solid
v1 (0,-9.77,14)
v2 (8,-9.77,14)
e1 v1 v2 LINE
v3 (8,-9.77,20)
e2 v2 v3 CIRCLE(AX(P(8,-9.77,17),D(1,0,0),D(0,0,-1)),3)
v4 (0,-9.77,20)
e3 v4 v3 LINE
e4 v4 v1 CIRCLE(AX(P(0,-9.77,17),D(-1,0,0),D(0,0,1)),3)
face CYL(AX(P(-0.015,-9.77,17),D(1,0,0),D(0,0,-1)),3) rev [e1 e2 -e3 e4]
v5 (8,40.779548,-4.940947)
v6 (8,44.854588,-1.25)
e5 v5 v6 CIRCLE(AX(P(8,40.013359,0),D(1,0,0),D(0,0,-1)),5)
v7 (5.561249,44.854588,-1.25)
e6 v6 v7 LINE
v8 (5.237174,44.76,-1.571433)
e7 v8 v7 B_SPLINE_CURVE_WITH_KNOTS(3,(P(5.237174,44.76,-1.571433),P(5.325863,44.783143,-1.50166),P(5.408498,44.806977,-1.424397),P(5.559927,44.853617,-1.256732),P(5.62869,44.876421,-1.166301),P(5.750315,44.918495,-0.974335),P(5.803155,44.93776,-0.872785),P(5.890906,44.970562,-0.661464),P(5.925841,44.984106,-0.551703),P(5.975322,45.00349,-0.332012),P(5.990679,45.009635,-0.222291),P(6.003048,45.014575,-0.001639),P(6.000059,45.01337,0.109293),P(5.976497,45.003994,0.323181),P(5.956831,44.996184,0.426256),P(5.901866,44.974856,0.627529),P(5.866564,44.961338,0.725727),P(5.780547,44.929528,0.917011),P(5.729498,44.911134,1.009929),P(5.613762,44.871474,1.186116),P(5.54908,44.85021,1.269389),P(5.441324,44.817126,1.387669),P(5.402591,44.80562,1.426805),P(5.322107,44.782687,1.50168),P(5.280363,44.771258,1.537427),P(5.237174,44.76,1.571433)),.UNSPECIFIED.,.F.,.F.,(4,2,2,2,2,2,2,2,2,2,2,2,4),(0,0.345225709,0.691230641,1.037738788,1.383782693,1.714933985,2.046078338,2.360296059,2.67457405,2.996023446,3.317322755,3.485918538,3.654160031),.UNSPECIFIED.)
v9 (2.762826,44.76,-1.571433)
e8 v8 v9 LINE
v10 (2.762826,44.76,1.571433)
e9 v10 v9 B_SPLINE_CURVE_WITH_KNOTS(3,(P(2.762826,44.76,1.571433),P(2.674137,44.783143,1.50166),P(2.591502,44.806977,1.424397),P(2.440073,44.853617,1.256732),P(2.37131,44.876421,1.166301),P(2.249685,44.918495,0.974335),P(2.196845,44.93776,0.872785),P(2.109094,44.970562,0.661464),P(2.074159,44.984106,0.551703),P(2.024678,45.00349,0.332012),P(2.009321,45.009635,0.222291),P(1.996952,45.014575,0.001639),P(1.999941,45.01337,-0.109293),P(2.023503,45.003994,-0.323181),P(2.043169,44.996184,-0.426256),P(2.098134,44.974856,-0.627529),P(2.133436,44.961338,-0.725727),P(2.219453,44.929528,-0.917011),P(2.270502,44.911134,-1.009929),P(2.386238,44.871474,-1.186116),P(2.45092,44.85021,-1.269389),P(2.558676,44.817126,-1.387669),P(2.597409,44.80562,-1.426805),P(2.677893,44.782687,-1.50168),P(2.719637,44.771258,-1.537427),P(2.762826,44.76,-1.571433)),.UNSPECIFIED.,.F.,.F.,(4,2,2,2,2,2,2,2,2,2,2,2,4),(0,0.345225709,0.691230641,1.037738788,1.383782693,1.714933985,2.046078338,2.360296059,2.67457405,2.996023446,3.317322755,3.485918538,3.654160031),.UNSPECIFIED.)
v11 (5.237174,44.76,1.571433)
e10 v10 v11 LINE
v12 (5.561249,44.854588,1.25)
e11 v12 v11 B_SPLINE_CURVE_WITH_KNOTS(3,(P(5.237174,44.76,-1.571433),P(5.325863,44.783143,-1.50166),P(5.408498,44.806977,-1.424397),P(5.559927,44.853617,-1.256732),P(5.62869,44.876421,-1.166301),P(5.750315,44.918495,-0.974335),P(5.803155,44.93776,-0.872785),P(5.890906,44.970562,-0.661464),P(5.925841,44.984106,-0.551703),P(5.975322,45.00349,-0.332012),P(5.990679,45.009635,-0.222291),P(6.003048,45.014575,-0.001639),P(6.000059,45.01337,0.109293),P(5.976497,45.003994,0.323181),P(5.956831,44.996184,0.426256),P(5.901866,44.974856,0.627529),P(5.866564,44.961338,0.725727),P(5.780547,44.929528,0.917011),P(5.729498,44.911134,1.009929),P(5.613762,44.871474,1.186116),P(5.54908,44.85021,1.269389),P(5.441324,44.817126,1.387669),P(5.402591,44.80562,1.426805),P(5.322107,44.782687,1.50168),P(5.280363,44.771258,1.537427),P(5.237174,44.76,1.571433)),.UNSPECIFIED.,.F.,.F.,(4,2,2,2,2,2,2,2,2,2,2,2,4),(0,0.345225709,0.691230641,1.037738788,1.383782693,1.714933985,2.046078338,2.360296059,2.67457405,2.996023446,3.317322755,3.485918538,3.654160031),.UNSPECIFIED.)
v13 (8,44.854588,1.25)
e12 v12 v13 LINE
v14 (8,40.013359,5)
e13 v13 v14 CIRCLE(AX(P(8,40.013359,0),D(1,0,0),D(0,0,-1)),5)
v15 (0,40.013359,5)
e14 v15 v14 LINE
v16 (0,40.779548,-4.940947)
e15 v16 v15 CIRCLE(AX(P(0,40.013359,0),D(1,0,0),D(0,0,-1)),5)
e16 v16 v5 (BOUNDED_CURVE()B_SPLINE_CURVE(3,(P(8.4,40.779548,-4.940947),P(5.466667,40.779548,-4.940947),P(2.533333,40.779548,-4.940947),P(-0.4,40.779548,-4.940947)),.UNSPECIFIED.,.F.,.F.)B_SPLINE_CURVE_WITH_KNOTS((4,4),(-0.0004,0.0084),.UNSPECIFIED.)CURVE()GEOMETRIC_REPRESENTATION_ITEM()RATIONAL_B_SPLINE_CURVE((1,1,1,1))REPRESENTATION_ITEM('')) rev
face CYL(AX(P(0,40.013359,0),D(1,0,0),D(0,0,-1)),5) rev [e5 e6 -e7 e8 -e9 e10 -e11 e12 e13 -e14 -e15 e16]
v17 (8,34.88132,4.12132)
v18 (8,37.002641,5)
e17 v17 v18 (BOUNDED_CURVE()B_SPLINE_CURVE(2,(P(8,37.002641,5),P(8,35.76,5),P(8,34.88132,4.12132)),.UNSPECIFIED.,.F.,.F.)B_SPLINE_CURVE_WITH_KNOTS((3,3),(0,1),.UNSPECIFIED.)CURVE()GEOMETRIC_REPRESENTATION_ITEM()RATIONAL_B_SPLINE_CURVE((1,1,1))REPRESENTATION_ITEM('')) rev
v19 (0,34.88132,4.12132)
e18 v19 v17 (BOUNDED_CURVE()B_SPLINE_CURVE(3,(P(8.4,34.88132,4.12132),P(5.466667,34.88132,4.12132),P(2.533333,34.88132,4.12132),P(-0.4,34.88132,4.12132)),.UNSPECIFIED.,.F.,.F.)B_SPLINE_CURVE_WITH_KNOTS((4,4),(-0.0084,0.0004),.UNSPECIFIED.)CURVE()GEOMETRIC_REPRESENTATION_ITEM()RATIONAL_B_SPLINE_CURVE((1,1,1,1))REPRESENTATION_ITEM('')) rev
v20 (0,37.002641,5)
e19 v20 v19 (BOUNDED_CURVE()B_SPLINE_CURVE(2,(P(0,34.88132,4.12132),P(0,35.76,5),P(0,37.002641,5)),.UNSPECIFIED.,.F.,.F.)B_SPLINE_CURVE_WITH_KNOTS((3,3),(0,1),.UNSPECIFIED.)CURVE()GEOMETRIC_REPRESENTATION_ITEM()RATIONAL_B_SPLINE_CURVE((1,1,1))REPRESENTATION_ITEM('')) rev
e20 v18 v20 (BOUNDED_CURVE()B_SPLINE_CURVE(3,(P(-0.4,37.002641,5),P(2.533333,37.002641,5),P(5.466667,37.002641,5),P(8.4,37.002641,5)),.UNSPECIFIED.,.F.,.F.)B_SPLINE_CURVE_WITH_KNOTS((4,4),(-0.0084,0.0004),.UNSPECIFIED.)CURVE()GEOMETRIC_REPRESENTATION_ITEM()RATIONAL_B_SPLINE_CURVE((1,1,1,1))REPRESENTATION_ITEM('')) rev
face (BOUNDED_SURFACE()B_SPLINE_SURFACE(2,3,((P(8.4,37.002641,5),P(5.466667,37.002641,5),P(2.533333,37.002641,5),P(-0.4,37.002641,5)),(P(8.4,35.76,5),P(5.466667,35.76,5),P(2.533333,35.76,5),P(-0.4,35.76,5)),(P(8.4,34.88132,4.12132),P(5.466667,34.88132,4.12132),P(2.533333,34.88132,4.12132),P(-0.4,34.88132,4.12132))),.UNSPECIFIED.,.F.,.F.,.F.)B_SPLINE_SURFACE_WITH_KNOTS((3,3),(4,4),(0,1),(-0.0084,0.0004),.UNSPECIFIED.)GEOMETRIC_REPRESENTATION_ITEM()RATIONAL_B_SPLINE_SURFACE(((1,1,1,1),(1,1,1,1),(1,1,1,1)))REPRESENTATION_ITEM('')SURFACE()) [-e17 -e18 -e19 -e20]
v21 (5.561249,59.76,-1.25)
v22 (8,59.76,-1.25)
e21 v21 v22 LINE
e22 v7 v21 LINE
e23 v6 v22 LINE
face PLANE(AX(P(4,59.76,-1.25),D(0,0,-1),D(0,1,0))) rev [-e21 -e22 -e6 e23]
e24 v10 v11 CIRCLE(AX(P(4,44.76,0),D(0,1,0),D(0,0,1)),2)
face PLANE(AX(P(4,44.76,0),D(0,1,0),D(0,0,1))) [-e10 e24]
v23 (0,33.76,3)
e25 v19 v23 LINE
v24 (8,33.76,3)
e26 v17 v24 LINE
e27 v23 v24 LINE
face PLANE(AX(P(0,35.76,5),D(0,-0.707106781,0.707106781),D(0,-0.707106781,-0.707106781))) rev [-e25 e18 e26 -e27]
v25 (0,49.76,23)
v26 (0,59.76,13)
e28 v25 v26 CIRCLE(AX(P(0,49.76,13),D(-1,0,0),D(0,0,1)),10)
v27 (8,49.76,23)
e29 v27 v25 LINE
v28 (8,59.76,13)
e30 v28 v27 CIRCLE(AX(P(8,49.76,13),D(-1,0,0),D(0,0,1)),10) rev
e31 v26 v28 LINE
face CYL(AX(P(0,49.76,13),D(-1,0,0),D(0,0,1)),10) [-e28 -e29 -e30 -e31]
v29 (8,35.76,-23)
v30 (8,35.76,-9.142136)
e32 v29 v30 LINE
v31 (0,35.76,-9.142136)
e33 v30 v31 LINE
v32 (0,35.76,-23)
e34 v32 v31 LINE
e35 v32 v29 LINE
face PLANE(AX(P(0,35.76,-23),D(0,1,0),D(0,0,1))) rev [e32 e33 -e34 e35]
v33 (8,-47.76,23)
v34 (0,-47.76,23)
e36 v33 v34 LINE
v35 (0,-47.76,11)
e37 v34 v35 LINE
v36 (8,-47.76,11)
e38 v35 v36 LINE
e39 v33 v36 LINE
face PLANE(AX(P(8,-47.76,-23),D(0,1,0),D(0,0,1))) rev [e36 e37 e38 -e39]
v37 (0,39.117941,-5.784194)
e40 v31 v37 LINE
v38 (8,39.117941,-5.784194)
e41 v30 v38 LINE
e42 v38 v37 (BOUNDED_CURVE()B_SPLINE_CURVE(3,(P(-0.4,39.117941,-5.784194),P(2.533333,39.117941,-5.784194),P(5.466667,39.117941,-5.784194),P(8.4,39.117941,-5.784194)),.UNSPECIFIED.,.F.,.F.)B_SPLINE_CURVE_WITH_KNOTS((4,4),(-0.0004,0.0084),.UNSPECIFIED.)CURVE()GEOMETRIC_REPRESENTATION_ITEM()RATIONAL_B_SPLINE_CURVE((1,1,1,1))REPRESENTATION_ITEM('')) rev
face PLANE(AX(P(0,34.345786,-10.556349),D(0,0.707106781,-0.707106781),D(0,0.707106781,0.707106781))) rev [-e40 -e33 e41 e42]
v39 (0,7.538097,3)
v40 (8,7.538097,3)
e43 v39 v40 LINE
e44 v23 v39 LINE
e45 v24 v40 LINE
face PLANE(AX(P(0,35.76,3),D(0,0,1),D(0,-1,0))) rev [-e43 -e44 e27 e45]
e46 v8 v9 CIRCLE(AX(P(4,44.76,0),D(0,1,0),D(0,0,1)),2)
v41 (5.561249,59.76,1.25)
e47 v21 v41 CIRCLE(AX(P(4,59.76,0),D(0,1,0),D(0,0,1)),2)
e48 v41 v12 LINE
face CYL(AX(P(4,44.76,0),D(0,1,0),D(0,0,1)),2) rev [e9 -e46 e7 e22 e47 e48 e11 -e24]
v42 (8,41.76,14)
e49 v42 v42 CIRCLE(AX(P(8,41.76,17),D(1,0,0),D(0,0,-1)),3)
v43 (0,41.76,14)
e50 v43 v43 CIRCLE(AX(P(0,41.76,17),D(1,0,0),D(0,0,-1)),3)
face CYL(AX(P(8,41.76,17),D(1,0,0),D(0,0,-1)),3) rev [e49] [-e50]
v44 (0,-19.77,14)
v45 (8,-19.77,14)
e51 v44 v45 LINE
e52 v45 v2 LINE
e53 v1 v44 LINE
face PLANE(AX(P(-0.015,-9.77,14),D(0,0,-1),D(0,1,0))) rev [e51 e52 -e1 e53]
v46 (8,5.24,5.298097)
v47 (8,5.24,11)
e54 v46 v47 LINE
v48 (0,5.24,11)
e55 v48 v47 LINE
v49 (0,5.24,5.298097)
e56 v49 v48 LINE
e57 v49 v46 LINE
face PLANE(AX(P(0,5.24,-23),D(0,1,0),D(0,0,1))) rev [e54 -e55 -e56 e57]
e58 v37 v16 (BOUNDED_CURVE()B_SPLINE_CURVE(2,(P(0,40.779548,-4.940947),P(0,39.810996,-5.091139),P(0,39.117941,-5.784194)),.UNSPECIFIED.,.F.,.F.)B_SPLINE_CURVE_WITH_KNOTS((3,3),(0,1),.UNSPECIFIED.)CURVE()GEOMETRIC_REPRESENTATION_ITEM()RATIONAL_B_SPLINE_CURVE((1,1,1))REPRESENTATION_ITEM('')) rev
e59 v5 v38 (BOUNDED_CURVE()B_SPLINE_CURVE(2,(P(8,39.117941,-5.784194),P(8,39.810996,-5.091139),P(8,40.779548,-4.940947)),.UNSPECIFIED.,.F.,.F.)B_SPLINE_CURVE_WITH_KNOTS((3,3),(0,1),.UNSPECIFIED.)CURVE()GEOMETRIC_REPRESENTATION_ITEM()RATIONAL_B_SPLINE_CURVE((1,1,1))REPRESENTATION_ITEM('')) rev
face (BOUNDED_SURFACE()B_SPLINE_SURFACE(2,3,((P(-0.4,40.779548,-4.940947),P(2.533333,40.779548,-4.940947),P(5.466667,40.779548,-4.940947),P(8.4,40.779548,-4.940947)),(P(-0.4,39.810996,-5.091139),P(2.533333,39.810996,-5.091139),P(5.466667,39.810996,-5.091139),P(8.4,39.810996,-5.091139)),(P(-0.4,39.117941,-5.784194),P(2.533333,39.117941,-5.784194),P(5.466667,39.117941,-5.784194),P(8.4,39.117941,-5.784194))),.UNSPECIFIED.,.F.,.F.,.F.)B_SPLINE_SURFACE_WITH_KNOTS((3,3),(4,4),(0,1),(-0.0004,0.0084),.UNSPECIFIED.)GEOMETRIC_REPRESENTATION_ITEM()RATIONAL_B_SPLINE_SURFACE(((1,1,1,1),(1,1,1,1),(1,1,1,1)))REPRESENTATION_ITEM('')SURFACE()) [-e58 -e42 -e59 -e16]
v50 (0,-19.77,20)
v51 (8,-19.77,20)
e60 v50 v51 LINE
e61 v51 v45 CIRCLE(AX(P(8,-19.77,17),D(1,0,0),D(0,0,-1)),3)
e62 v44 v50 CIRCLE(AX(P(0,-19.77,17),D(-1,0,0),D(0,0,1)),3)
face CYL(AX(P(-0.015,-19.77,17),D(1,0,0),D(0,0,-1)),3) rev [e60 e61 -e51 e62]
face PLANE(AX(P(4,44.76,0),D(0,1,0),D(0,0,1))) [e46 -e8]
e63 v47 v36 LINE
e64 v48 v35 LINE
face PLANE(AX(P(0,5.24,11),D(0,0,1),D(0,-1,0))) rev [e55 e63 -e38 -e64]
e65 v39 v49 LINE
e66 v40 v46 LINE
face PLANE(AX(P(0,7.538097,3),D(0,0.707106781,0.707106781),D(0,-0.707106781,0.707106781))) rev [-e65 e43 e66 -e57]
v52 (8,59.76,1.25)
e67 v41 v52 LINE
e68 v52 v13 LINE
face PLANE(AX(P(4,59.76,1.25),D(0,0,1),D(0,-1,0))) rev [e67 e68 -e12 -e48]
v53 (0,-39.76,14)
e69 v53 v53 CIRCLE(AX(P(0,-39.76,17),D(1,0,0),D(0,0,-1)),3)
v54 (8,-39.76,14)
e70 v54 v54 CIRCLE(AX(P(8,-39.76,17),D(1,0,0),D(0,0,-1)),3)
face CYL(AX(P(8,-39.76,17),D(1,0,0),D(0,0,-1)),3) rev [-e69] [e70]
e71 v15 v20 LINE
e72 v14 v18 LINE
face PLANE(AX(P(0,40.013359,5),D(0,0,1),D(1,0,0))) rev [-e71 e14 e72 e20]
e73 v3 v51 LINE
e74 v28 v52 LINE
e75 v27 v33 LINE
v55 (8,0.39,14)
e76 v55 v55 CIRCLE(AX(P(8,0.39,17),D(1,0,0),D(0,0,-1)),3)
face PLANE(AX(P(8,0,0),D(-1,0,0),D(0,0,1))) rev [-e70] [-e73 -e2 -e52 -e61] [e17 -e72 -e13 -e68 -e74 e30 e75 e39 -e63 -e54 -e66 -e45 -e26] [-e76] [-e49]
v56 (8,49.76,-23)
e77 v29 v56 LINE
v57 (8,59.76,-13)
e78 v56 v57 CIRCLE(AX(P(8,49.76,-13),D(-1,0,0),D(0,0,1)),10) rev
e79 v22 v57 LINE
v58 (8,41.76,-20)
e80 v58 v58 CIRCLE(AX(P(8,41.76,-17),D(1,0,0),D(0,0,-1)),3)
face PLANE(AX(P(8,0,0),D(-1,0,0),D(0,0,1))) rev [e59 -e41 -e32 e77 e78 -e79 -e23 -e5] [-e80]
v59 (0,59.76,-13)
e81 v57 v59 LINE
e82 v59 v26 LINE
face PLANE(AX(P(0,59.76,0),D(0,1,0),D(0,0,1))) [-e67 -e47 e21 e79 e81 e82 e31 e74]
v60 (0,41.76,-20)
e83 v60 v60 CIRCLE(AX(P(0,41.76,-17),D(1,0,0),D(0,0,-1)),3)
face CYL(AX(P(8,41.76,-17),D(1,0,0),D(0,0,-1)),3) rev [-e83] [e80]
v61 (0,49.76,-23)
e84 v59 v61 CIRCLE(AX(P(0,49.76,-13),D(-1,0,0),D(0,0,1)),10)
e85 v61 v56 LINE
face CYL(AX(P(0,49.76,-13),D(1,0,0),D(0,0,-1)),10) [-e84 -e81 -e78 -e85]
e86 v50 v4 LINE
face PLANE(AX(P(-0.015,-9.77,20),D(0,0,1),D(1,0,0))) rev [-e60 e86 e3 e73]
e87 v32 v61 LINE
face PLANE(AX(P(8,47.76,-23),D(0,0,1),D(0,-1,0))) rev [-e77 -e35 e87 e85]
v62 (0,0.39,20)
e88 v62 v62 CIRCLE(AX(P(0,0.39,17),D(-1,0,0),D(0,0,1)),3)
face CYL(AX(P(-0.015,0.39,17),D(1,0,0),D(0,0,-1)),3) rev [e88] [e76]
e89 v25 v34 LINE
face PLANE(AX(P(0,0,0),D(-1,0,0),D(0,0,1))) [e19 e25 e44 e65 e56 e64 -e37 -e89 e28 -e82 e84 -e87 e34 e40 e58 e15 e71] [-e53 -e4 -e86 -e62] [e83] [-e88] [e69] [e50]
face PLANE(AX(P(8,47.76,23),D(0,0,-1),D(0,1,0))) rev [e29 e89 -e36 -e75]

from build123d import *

# Parameters (mm, degrees)
SKETCH1_W                       = 46
SKETCH1_H                       = 95.52
BOSS_EXTRUDE1_DEPTH             = 8
F_6_0MM_CLEARANCE_DOWEL_HOLE1_D = 6
SKETCH4_W                       = 8
SKETCH4_H                       = 46
BOSS_EXTRUDE2_DEPTH             = 12
FILLET1_R                       = 10
SKETCH6_R                       = 2
CUT_EXTRUDE2_DEPTH              = 15
SKETCH9_W                       = 26
SKETCH9_H                       = 30.52
CUT_EXTRUDE5_DEPTH              = 65.531059189
F_6_0MM_CLEARANCE_DOWEL_HOLE2_D = 6
CUT_EXTRUDE13_DEPTH             = 65.531059189
SKETCH7_W                       = 2.5
SKETCH7_H                       = 15
CUT_EXTRUDE12_DEPTH             = 4
SKETCH16_W                      = 34
SKETCH16_H                      = 53
CUT_EXTRUDE9_DEPTH              = 65.531059294
CUT_EXTRUDE14_DEPTH             = 65.531059294
CUT_EXTRUDE15_DEPTH             = 65.531059294
FILLET2_START                   = -1
FILLET2_DEPTH                   = 10
SKETCH22_R                      = 3
CUT_EXTRUDE16_DEPTH             = 65.531059329


with BuildPart() as part:
    # Sketch1 → Boss-Extrude1 (new body)
    with BuildSketch(Plane(origin=(0, 0, 0), x_dir=(0, 0, -1), z_dir=(1, 0, 0))):
        Rectangle(SKETCH1_W, SKETCH1_H)
    extrude(amount=BOSS_EXTRUDE1_DEPTH)

    # Ø6.0mm Clearance Dowel Hole1 (through all)
    with Locations(Plane(origin=(8, 0, 0), x_dir=(0, 0, -1), z_dir=(1, 0, 0))):
        with Locations((-17, 41.76), (17, 41.76)):
            Hole(F_6_0MM_CLEARANCE_DOWEL_HOLE1_D / 2)

    # Sketch4 → Boss-Extrude2 (add)
    with BuildSketch(Plane(origin=(0, 47.76, 0), x_dir=(1, 0, 0), z_dir=(0, 1, 0))):
        with Locations((4, 0)):
            Rectangle(SKETCH4_W, SKETCH4_H)
    extrude(amount=BOSS_EXTRUDE2_DEPTH)

    # Fillet1
    fillet1_edges = [part.edges().sort_by_distance(p)[0] for p in [
        (4, 59.76, 23),
        (4, 59.76, -23),
    ]]
    fillet(fillet1_edges, radius=FILLET1_R)

    # Sketch6 → Cut-Extrude2 (cut)
    with BuildSketch(Plane(origin=(0, 59.76, 0), x_dir=(1, 0, 0), z_dir=(0, 1, 0))):
        with Locations(Location((4, 0, 0), (0, 0, 270))):
            Circle(SKETCH6_R)
    extrude(amount=-CUT_EXTRUDE2_DEPTH, mode=Mode.SUBTRACT)

    # Sketch9 → Cut-Extrude5 (cut, through all)
    with BuildSketch(Plane(origin=(8, 0, 0), x_dir=(0, 0, -1), z_dir=(1, 0, 0))):
        with Locations((10, 20.5)):
            Rectangle(SKETCH9_W, SKETCH9_H)
    extrude(amount=-CUT_EXTRUDE5_DEPTH, mode=Mode.SUBTRACT)

    # Ø6.0mm Clearance Dowel Hole2 (through all)
    with Locations(Plane(origin=(8, 0, 0), x_dir=(0, 0, -1), z_dir=(1, 0, 0))):
        with Locations((-17, -39.76)):
            Hole(F_6_0MM_CLEARANCE_DOWEL_HOLE2_D / 2)

    # Sketch14 → Cut-Extrude13 (cut, through all)
    with BuildSketch(Plane(origin=(8, 0, 0), x_dir=(0, 0, -1), z_dir=(1, 0, 0))):
        with BuildLine():
            Line((5, 40.013359235), (5, 35.76))
            Line((5, 35.76), (-5, 35.76))
            Line((-5, 35.76), (-5, 40.013359235))
            ThreePointArc((-5, 40.013359235), (0, 45.013359235), (5, 40.013359235))
        make_face()
    extrude(amount=-CUT_EXTRUDE13_DEPTH, mode=Mode.SUBTRACT)

    # Sketch7 → Cut-Extrude12 (cut)
    with BuildSketch(Plane(origin=(8, 0, 0), x_dir=(0, 0, -1), z_dir=(1, 0, 0))):
        with Locations((0, 52.26)):
            Rectangle(SKETCH7_W, SKETCH7_H)
    extrude(amount=-CUT_EXTRUDE12_DEPTH, mode=Mode.SUBTRACT)

    # Sketch16 → Cut-Extrude9 (cut, through all)
    with BuildSketch(Plane(origin=(8, 0, 0), x_dir=(0, 0, -1), z_dir=(1, 0, 0))):
        with Locations((6, -21.26)):
            Rectangle(SKETCH16_W, SKETCH16_H)
    extrude(amount=-CUT_EXTRUDE9_DEPTH, mode=Mode.SUBTRACT)

    # Sketch19 → Cut-Extrude14 (cut, through all)
    with BuildSketch(Plane(origin=(8, 0, 0), x_dir=(0, 0, -1), z_dir=(1, 0, 0))):
        Polygon((-5, 35.76), (3.485281374, 27.274718626), (10.556349186, 34.345786438), (2.071067812, 42.831067812), align=None)
    extrude(amount=-CUT_EXTRUDE14_DEPTH, mode=Mode.SUBTRACT)

    # Sketch21 → Cut-Extrude15 (cut, through all)
    with BuildSketch(Plane(origin=(8, 0, 0), x_dir=(0, 0, -1), z_dir=(1, 0, 0))):
        Polygon((-3, 7.538097039), (-5.298097039, 5.24), (-3, 5.24), align=None)
    extrude(amount=-CUT_EXTRUDE15_DEPTH, mode=Mode.SUBTRACT)

    # Fillet2: read off the stored shape, not the designer's step
    # Fillet2 outline → Fillet2 (cut)
    with BuildSketch(Plane.YZ.offset(FILLET2_START)):
        with BuildLine():
            add(Edge.make_bspline(
                [(40.779548187, -4.94094672), (39.810996275, -5.091139348), (39.117941215, -5.784194408)],
                knots=[0, 0, 0, 1, 1, 1], degree=2))
            ThreePointArc((40.779548187, -4.94094672), (40.397589895, -4.98521482), (40.013359235, -5))
            Line((40.013359235, -5), (39.902135624, -5))
            Line((39.902135624, -5), (39.117941215, -5.784194408))
        make_face()
    extrude(amount=FILLET2_DEPTH, mode=Mode.SUBTRACT)

    # Fillet3
    # a fillet whose section is not a circle: 3 mm, written as the material it adds along each edge
    with BuildSketch(Plane(origin=(8, 35.76, 5), x_dir=(0, 1, 0), z_dir=(-1, 0, 0))) as fillet3_piece_1:
        with BuildLine():
            Bezier((1.242640687, 0), (0, 0), (-0.878679656, 0.878679656), weights=[1, 1, 1])
            Line((-0.878679656, 0.878679656), (0, 0))
            Line((0, 0), (1.242640687, 0))
        make_face()
    extrude(amount=8)

    # Sketch22 → Cut-Extrude16 (cut, through all)
    with BuildSketch(Plane(origin=(8, 0, 0), x_dir=(0, 0, -1), z_dir=(1, 0, 0))):
        with Locations((-17, 0.39)):
            Circle(SKETCH22_R)
        with BuildLine():
            Line((-14, -9.77), (-14, -19.77))
            ThreePointArc((-14, -19.77), (-17, -22.77), (-20, -19.77))
            Line((-20, -19.77), (-20, -9.77))
            ThreePointArc((-20, -9.77), (-17, -6.77), (-14, -9.77))
        make_face()
    extrude(amount=-CUT_EXTRUDE16_DEPTH, mode=Mode.SUBTRACT)


solid = part.part
